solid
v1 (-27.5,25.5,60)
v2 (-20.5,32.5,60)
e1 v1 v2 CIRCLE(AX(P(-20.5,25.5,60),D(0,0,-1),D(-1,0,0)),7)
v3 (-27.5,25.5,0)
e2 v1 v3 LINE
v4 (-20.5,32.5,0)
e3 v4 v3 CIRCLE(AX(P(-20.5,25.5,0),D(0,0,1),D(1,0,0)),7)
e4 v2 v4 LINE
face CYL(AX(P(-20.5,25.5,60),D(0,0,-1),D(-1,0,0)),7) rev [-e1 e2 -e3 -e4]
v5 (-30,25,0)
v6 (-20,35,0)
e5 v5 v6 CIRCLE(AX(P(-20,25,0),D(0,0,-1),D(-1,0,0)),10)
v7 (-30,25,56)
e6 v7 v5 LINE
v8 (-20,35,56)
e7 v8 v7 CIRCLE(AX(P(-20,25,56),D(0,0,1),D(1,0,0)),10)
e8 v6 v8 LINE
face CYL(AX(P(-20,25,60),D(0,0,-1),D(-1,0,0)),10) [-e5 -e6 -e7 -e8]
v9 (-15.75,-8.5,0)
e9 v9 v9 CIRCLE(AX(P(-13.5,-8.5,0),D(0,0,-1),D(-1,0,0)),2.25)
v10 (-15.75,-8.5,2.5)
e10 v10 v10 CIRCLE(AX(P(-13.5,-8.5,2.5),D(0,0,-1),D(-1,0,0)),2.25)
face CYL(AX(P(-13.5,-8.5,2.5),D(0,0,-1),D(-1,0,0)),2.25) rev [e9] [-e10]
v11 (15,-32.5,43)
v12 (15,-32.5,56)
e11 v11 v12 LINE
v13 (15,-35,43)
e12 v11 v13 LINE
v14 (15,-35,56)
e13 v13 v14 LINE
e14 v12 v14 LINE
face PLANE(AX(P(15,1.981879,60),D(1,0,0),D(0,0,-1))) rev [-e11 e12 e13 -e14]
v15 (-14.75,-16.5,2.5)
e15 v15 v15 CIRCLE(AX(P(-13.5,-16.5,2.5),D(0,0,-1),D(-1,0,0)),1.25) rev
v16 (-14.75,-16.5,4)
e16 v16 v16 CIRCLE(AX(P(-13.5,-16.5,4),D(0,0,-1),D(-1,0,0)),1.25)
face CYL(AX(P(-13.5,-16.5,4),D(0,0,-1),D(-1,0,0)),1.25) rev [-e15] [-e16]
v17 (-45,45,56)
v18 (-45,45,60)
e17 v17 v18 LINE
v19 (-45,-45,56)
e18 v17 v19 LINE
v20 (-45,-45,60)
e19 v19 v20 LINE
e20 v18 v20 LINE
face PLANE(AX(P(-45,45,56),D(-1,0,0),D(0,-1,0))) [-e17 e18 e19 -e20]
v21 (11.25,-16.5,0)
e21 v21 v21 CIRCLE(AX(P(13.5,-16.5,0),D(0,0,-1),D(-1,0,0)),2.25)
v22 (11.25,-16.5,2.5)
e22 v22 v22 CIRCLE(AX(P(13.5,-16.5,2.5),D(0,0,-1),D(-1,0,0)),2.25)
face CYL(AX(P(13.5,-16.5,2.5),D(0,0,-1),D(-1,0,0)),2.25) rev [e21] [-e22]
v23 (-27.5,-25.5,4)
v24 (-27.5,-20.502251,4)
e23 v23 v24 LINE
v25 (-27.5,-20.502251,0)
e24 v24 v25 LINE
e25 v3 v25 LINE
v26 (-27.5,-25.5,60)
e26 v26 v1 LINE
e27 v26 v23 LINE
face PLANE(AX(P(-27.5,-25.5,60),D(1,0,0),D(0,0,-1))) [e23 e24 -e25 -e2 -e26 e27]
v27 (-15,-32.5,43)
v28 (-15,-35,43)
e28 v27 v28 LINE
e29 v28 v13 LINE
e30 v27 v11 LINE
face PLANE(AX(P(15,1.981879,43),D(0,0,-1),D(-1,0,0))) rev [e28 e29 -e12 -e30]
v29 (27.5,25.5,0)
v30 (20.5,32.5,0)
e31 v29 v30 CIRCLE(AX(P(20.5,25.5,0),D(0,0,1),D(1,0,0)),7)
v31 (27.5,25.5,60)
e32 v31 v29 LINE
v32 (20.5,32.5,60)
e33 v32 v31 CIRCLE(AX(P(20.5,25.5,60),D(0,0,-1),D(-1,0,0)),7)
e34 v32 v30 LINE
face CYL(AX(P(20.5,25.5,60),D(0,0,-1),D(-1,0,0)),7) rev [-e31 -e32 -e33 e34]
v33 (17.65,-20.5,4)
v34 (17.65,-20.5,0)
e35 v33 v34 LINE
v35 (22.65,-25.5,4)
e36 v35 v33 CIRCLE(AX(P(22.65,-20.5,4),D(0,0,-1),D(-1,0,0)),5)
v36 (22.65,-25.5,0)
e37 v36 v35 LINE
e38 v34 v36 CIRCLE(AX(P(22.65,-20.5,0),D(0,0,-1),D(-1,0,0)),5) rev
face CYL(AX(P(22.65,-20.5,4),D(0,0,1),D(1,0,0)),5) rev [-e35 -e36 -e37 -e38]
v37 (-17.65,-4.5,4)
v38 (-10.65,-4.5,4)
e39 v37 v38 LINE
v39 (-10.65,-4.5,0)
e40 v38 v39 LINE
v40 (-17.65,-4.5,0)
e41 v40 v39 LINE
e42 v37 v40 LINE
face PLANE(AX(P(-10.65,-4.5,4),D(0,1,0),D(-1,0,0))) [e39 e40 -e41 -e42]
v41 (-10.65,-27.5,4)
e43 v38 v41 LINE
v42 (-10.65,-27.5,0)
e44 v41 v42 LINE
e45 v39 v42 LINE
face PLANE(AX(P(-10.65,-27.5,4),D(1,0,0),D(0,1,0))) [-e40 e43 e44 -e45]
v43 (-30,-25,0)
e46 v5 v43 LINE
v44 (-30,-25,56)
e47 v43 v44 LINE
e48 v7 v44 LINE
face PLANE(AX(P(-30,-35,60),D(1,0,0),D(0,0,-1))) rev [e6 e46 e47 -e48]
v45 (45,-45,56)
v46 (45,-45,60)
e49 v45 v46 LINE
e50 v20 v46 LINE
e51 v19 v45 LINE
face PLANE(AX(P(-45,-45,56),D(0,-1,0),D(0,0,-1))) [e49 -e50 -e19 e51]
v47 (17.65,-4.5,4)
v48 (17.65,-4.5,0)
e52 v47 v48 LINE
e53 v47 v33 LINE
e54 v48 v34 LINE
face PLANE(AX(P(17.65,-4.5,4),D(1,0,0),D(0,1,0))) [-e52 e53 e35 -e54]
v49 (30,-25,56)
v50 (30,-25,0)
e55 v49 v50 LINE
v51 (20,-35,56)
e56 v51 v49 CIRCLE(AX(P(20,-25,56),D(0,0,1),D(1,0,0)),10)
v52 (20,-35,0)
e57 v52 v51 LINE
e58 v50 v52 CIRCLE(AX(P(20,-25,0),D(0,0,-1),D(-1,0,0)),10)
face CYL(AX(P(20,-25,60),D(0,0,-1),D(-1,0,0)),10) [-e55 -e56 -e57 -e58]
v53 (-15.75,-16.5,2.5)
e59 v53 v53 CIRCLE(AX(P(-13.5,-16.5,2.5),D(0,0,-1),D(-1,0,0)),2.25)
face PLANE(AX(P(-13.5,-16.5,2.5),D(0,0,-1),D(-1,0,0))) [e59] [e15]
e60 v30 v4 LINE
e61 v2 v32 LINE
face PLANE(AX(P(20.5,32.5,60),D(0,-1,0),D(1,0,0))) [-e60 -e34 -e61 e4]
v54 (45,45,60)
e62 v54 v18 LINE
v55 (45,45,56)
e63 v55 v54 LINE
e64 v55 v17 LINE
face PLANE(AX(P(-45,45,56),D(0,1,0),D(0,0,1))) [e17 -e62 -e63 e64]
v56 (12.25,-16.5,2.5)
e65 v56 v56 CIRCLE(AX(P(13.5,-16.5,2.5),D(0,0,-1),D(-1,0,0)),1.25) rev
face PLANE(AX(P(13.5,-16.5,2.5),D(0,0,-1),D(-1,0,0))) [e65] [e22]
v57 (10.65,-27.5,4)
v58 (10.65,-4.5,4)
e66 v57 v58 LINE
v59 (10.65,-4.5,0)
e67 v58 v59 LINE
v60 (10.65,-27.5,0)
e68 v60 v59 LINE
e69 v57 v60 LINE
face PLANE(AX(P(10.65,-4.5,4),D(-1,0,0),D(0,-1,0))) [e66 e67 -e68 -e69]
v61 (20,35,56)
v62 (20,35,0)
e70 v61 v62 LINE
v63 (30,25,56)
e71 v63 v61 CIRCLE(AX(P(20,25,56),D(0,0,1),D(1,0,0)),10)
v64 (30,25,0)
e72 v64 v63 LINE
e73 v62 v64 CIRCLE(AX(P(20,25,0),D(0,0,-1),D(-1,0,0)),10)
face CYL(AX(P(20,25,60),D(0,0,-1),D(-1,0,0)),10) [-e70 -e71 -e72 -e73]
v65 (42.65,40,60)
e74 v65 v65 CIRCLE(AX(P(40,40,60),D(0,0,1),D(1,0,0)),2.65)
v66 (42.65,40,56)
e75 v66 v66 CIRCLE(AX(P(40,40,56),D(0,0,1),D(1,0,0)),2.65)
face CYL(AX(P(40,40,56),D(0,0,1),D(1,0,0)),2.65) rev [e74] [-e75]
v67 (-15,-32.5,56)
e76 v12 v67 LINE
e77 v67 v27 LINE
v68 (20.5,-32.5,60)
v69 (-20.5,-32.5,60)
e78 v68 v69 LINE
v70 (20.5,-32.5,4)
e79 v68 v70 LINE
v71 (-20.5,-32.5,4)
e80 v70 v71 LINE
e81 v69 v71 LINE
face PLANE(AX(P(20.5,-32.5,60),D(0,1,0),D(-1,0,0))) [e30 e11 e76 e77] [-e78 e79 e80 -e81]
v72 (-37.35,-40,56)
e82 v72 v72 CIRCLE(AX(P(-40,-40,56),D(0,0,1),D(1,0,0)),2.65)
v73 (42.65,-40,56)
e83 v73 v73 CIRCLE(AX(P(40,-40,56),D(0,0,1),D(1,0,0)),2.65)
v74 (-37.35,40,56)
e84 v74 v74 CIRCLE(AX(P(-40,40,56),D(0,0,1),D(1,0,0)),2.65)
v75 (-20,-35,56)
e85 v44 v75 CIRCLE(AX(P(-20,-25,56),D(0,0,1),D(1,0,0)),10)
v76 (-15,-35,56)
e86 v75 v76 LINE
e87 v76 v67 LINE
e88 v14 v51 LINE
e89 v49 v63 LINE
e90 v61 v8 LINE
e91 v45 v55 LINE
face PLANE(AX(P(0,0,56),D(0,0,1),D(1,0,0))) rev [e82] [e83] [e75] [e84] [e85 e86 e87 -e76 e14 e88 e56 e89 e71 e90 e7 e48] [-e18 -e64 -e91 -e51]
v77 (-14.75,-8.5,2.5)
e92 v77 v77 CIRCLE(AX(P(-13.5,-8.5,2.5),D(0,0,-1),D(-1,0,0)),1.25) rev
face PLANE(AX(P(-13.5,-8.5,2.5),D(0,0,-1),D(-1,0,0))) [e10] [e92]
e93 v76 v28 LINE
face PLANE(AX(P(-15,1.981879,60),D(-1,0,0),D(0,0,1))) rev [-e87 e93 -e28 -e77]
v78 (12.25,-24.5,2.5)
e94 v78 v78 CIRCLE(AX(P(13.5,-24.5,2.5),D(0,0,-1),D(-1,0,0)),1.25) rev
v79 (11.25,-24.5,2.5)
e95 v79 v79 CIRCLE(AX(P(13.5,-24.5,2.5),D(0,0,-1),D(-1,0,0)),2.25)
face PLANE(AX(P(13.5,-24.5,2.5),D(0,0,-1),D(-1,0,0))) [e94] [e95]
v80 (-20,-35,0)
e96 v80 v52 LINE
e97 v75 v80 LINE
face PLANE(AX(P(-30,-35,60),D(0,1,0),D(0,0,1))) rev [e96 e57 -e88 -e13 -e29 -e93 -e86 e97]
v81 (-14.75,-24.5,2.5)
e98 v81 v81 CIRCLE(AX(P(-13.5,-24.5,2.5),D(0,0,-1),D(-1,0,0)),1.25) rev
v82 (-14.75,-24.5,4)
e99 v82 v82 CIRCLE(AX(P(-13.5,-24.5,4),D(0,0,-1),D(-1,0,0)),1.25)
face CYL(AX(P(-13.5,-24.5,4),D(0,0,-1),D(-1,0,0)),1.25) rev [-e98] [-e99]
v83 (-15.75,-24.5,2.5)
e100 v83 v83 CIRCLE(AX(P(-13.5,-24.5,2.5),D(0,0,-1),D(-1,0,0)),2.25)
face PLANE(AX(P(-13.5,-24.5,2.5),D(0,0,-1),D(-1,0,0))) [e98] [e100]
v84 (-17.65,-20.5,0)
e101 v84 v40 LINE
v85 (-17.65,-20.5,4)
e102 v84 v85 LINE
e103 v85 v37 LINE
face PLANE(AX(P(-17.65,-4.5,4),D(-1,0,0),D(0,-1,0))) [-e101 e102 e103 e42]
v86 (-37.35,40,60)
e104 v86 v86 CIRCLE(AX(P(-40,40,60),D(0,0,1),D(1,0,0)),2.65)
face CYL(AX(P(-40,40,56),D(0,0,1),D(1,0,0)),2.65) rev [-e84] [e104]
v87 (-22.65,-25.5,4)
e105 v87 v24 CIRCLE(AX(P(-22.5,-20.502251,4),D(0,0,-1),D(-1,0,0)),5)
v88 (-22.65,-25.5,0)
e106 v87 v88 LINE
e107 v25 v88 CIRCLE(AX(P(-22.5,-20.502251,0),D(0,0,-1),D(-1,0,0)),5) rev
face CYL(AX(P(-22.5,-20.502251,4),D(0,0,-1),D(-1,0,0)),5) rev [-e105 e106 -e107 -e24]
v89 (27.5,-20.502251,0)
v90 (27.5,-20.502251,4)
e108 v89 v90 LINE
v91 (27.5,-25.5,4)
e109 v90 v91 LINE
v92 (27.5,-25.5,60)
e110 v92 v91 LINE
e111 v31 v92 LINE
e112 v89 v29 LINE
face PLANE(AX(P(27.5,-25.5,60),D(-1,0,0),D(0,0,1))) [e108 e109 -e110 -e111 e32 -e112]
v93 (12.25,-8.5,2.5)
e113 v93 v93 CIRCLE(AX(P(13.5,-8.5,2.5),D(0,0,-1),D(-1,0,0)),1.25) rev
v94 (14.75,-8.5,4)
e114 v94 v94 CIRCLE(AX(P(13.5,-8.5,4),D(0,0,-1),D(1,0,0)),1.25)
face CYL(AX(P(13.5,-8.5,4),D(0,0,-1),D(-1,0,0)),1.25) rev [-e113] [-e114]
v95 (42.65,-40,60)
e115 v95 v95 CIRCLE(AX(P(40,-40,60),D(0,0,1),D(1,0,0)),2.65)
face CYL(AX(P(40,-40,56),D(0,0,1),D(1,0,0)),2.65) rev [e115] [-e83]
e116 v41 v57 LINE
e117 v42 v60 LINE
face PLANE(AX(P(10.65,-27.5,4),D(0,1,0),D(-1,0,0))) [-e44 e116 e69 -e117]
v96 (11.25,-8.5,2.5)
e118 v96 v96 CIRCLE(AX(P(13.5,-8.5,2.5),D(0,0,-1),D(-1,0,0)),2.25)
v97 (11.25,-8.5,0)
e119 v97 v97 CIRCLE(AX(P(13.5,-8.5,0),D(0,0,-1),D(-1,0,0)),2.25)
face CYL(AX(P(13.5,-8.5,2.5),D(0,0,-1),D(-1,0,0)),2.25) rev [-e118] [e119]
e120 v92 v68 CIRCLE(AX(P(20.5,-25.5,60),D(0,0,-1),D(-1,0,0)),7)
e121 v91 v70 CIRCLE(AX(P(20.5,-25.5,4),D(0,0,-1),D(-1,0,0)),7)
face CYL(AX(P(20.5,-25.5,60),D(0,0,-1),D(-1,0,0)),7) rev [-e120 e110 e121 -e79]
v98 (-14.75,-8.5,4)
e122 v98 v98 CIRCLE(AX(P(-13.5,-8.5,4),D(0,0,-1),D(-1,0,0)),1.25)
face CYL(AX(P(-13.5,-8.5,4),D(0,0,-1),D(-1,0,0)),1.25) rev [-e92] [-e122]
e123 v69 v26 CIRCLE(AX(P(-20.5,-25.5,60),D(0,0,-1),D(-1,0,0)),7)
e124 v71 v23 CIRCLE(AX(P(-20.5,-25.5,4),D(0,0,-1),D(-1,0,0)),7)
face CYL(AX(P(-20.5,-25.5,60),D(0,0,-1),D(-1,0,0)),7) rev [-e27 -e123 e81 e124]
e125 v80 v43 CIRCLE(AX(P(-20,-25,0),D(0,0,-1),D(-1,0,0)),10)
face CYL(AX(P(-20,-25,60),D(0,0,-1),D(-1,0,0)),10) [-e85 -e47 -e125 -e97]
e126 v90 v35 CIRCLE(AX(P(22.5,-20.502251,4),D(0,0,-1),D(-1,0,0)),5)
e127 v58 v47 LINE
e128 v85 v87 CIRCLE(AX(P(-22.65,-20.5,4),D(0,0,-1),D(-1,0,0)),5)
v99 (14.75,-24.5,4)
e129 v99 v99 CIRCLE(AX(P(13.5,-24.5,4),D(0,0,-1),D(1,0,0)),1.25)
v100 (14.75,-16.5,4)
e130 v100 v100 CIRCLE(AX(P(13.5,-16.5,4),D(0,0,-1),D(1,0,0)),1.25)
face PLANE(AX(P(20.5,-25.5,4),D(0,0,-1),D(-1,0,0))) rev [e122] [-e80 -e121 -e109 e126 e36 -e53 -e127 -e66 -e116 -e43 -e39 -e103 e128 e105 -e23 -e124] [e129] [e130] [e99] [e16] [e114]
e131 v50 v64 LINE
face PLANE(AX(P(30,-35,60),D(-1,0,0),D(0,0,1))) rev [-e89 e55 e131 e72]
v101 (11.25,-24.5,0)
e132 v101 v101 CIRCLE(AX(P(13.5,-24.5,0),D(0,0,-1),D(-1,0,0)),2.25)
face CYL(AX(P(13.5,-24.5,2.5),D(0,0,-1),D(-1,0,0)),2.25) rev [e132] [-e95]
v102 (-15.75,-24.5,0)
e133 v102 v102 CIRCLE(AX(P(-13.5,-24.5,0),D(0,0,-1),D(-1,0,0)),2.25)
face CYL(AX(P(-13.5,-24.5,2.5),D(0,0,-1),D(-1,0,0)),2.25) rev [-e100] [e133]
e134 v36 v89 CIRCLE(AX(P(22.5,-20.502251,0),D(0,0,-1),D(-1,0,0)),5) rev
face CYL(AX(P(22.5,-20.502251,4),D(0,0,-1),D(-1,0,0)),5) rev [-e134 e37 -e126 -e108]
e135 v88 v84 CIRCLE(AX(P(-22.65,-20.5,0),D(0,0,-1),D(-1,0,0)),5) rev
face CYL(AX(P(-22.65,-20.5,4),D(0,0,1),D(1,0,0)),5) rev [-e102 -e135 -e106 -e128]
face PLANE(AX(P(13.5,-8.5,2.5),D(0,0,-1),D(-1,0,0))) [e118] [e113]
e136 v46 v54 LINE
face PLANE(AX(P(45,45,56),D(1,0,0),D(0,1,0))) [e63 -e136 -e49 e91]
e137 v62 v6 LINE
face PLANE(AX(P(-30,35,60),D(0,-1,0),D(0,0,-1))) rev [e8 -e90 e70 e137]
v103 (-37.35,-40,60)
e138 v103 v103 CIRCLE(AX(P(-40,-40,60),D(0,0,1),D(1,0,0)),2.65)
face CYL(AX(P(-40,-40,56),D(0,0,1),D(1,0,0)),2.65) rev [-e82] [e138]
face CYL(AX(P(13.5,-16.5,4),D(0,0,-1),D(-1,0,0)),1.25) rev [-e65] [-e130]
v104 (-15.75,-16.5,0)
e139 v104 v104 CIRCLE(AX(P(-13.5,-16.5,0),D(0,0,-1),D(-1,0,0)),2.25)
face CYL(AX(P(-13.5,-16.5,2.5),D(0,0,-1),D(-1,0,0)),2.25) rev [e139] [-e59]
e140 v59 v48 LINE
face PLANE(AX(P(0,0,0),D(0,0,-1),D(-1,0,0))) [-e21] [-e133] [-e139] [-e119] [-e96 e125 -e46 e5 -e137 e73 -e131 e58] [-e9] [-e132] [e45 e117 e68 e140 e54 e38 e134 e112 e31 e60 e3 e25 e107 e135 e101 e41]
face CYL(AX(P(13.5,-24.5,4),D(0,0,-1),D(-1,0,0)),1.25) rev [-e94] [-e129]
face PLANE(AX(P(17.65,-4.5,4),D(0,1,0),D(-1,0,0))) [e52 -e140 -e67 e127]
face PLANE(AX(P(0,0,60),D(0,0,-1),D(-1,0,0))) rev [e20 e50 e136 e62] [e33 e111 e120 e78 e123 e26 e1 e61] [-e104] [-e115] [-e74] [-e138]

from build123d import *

# Parameters (mm, degrees)
SKETCH1_W           = 60
SKETCH1_H           = 70
BOSS_EXTRUDE1_DEPTH = 60
SKETCH2_R           = 1.25
BOSS_EXTRUDE2_DEPTH = 4
SKETCH4_W           = 30
SKETCH4_H           = 17
CUT_EXTRUDE1_DEPTH  = 2.5
SKETCH5_R           = 2.25
CUT_EXTRUDE2_DEPTH  = 2.5
SKETCH6_W           = 90
SKETCH6_H           = 90
SKETCH6_R           = 2.65
BOSS_EXTRUDE3_DEPTH = 4
FILLET1_R           = 10
CUT_EXTRUDE5_DEPTH  = 85.77027781
FILLET3_R           = 5
FILLET4_R           = 5


with BuildPart() as part:
    # Sketch1 → Boss-Extrude1 (new body)
    with BuildSketch(Plane.XY):
        Rectangle(SKETCH1_W, SKETCH1_H)
        with BuildLine():
            Line((20.5, -32.5), (-20.5, -32.5))
            ThreePointArc((-20.5, -32.5), (-25.449747468, -30.449747468), (-27.5, -25.5))
            Line((-27.5, -25.5), (-27.5, 25.5))
            ThreePointArc((-27.5, 25.5), (-25.449747468, 30.449747468), (-20.5, 32.5))
            Line((-20.5, 32.5), (20.5, 32.5))
            ThreePointArc((20.5, 32.5), (25.449747468, 30.449747468), (27.5, 25.5))
            Line((27.5, 25.5), (27.5, -25.5))
            ThreePointArc((27.5, -25.5), (25.449747468, -30.449747468), (20.5, -32.5))
        make_face(mode=Mode.SUBTRACT)
    extrude(amount=BOSS_EXTRUDE1_DEPTH)

    # Sketch2 → Boss-Extrude2 (add)
    with BuildSketch(Plane(origin=(0, 0, 0), x_dir=(-1, 0, 0), z_dir=(0, 0, -1))):
        with BuildLine():
            Line((-17.65, -4.5), (-10.65, -4.5))
            Line((-10.65, -4.5), (-10.65, -27.5))
            Line((-10.65, -27.5), (10.65, -27.5))
            Line((10.65, -27.5), (10.65, -4.5))
            Line((10.65, -4.5), (17.65, -4.5))
            Line((17.65, -4.5), (17.65, -25.5))
            Line((17.65, -25.5), (27.5, -25.5))
            ThreePointArc((27.5, -25.5), (25.449747468, -30.449747468), (20.5, -32.5))
            Line((20.5, -32.5), (-20.5, -32.5))
            ThreePointArc((-20.5, -32.5), (-25.449747468, -30.449747468), (-27.5, -25.5))
            Line((-27.5, -25.5), (-17.65, -25.5))
            Line((-17.65, -25.5), (-17.65, -4.5))
        make_face()
        with Locations((13.5, -8.5)):
            Circle(SKETCH2_R, mode=Mode.SUBTRACT)
        with Locations((13.5, -16.5)):
            Circle(SKETCH2_R, mode=Mode.SUBTRACT)
        with Locations((13.5, -24.5)):
            Circle(SKETCH2_R, mode=Mode.SUBTRACT)
        with Locations(Location((-13.5, -8.5, 0), (0, 0, 180))):
            Circle(SKETCH2_R, mode=Mode.SUBTRACT)
        with Locations(Location((-13.5, -16.5, 0), (0, 0, 180))):
            Circle(SKETCH2_R, mode=Mode.SUBTRACT)
        with Locations(Location((-13.5, -24.5, 0), (0, 0, 180))):
            Circle(SKETCH2_R, mode=Mode.SUBTRACT)
    extrude(amount=-BOSS_EXTRUDE2_DEPTH)

    # Sketch4 → Cut-Extrude1 (cut)
    with BuildSketch(Plane.XZ.offset(35)):
        with Locations((0, 51.5)):
            Rectangle(SKETCH4_W, SKETCH4_H)
    extrude(amount=-CUT_EXTRUDE1_DEPTH, mode=Mode.SUBTRACT)

    # Sketch5 → Cut-Extrude2 (cut)
    with BuildSketch(Plane(origin=(0, 0, 0), x_dir=(-1, 0, 0), z_dir=(0, 0, -1))):
        with Locations((-13.5, -8.5)):
            Circle(SKETCH5_R)
        with Locations((-13.5, -16.5)):
            Circle(SKETCH5_R)
        with Locations((-13.5, -24.5)):
            Circle(SKETCH5_R)
        with Locations((13.5, -24.5)):
            Circle(SKETCH5_R)
        with Locations((13.5, -16.5)):
            Circle(SKETCH5_R)
        with Locations((13.5, -8.5)):
            Circle(SKETCH5_R)
    extrude(amount=-CUT_EXTRUDE2_DEPTH, mode=Mode.SUBTRACT)

    # Sketch6 → Boss-Extrude3 (add)
    with BuildSketch(Plane.XY.offset(60)):
        Rectangle(SKETCH6_W, SKETCH6_H)
        with Locations((40, 40)):
            Circle(SKETCH6_R, mode=Mode.SUBTRACT)
        with Locations((-40, 40)):
            Circle(SKETCH6_R, mode=Mode.SUBTRACT)
        with Locations((-40, -40)):
            Circle(SKETCH6_R, mode=Mode.SUBTRACT)
        with Locations((40, -40)):
            Circle(SKETCH6_R, mode=Mode.SUBTRACT)
    extrude(amount=-BOSS_EXTRUDE3_DEPTH)

    # Fillet1
    fillet1_edges = [part.edges().sort_by_distance(p)[0] for p in [
        (-30, -35, 28),
        (30, -35, 28),
        (-30, 35, 28),
        (30, 35, 28),
    ]]
    fillet(fillet1_edges, radius=FILLET1_R)

    # Sketch8 → Cut-Extrude5 (cut, through all)
    with BuildSketch(Plane(origin=(0, 0, 56), x_dir=(-1, 0, 0), z_dir=(0, 0, -1))):
        with BuildLine():
            Line((-20.5, 32.5), (20.5, 32.5))
            ThreePointArc((20.5, 32.5), (25.449747468, 30.449747468), (27.5, 25.5))
            Line((27.5, 25.5), (27.5, -25.5))
            ThreePointArc((27.5, -25.5), (25.449747468, -30.449747468), (20.5, -32.5))
            Line((20.5, -32.5), (-20.5, -32.5))
            ThreePointArc((-20.5, -32.5), (-25.449747468, -30.449747468), (-27.5, -25.5))
            Line((-27.5, -25.5), (-27.5, 25.5))
            ThreePointArc((-27.5, 25.5), (-25.449747468, 30.449747468), (-20.5, 32.5))
        make_face()
    extrude(amount=-CUT_EXTRUDE5_DEPTH, mode=Mode.SUBTRACT)

    # Fillet3
    fillet3_edges = [part.edges().sort_by_distance(p)[0] for p in [
        (17.65, -25.5, 2),
        (-17.65, -25.5, 2),
    ]]
    fillet(fillet3_edges, radius=FILLET3_R)

    # Fillet4
    # the kernel refuses this fillet: 5 mm, written as the material it adds along each edge
    with BuildSketch(Plane(origin=(-27.5, -25.5, 0), x_dir=(1, 0, 0), z_dir=(0, 0, 1))) as fillet4_piece_1:
        with BuildLine():
            CenterArc((5, 4.997749494), FILLET4_R, 180, 88.280868679)
            Line((0, 4.997749494), (-0.1, 4.997749494))
            Line((-0.1, 4.997749494), (-0.1, 0))
            Line((-0.1, 0), (0, -0.1))
            ThreePointArc((0, -0.1), (2.425, -0.1), (4.847, -0.09995499))
            Line((4.847, -0.09995499), (4.85, 0))
        make_face()
    extrude(amount=4)
    with BuildSketch(Plane(origin=(27.5, -25.5, 0), x_dir=(0, 1, 0), z_dir=(0, 0, 1))) as fillet4_piece_2:
        with BuildLine():
            CenterArc((4.997749494, 5), FILLET4_R, 181.719131321, 88.280868679)
            Line((0, 4.85), (-0.09995499, 4.847))
            ThreePointArc((-0.09995499, 4.847), (-0.1, 2.425), (-0.1, 0))
            Line((-0.1, 0), (0, -0.1))
            Line((0, -0.1), (4.997749494, -0.1))
            Line((4.997749494, -0.1), (4.997749494, 0))
        make_face()
    extrude(amount=4)


solid = part.part
